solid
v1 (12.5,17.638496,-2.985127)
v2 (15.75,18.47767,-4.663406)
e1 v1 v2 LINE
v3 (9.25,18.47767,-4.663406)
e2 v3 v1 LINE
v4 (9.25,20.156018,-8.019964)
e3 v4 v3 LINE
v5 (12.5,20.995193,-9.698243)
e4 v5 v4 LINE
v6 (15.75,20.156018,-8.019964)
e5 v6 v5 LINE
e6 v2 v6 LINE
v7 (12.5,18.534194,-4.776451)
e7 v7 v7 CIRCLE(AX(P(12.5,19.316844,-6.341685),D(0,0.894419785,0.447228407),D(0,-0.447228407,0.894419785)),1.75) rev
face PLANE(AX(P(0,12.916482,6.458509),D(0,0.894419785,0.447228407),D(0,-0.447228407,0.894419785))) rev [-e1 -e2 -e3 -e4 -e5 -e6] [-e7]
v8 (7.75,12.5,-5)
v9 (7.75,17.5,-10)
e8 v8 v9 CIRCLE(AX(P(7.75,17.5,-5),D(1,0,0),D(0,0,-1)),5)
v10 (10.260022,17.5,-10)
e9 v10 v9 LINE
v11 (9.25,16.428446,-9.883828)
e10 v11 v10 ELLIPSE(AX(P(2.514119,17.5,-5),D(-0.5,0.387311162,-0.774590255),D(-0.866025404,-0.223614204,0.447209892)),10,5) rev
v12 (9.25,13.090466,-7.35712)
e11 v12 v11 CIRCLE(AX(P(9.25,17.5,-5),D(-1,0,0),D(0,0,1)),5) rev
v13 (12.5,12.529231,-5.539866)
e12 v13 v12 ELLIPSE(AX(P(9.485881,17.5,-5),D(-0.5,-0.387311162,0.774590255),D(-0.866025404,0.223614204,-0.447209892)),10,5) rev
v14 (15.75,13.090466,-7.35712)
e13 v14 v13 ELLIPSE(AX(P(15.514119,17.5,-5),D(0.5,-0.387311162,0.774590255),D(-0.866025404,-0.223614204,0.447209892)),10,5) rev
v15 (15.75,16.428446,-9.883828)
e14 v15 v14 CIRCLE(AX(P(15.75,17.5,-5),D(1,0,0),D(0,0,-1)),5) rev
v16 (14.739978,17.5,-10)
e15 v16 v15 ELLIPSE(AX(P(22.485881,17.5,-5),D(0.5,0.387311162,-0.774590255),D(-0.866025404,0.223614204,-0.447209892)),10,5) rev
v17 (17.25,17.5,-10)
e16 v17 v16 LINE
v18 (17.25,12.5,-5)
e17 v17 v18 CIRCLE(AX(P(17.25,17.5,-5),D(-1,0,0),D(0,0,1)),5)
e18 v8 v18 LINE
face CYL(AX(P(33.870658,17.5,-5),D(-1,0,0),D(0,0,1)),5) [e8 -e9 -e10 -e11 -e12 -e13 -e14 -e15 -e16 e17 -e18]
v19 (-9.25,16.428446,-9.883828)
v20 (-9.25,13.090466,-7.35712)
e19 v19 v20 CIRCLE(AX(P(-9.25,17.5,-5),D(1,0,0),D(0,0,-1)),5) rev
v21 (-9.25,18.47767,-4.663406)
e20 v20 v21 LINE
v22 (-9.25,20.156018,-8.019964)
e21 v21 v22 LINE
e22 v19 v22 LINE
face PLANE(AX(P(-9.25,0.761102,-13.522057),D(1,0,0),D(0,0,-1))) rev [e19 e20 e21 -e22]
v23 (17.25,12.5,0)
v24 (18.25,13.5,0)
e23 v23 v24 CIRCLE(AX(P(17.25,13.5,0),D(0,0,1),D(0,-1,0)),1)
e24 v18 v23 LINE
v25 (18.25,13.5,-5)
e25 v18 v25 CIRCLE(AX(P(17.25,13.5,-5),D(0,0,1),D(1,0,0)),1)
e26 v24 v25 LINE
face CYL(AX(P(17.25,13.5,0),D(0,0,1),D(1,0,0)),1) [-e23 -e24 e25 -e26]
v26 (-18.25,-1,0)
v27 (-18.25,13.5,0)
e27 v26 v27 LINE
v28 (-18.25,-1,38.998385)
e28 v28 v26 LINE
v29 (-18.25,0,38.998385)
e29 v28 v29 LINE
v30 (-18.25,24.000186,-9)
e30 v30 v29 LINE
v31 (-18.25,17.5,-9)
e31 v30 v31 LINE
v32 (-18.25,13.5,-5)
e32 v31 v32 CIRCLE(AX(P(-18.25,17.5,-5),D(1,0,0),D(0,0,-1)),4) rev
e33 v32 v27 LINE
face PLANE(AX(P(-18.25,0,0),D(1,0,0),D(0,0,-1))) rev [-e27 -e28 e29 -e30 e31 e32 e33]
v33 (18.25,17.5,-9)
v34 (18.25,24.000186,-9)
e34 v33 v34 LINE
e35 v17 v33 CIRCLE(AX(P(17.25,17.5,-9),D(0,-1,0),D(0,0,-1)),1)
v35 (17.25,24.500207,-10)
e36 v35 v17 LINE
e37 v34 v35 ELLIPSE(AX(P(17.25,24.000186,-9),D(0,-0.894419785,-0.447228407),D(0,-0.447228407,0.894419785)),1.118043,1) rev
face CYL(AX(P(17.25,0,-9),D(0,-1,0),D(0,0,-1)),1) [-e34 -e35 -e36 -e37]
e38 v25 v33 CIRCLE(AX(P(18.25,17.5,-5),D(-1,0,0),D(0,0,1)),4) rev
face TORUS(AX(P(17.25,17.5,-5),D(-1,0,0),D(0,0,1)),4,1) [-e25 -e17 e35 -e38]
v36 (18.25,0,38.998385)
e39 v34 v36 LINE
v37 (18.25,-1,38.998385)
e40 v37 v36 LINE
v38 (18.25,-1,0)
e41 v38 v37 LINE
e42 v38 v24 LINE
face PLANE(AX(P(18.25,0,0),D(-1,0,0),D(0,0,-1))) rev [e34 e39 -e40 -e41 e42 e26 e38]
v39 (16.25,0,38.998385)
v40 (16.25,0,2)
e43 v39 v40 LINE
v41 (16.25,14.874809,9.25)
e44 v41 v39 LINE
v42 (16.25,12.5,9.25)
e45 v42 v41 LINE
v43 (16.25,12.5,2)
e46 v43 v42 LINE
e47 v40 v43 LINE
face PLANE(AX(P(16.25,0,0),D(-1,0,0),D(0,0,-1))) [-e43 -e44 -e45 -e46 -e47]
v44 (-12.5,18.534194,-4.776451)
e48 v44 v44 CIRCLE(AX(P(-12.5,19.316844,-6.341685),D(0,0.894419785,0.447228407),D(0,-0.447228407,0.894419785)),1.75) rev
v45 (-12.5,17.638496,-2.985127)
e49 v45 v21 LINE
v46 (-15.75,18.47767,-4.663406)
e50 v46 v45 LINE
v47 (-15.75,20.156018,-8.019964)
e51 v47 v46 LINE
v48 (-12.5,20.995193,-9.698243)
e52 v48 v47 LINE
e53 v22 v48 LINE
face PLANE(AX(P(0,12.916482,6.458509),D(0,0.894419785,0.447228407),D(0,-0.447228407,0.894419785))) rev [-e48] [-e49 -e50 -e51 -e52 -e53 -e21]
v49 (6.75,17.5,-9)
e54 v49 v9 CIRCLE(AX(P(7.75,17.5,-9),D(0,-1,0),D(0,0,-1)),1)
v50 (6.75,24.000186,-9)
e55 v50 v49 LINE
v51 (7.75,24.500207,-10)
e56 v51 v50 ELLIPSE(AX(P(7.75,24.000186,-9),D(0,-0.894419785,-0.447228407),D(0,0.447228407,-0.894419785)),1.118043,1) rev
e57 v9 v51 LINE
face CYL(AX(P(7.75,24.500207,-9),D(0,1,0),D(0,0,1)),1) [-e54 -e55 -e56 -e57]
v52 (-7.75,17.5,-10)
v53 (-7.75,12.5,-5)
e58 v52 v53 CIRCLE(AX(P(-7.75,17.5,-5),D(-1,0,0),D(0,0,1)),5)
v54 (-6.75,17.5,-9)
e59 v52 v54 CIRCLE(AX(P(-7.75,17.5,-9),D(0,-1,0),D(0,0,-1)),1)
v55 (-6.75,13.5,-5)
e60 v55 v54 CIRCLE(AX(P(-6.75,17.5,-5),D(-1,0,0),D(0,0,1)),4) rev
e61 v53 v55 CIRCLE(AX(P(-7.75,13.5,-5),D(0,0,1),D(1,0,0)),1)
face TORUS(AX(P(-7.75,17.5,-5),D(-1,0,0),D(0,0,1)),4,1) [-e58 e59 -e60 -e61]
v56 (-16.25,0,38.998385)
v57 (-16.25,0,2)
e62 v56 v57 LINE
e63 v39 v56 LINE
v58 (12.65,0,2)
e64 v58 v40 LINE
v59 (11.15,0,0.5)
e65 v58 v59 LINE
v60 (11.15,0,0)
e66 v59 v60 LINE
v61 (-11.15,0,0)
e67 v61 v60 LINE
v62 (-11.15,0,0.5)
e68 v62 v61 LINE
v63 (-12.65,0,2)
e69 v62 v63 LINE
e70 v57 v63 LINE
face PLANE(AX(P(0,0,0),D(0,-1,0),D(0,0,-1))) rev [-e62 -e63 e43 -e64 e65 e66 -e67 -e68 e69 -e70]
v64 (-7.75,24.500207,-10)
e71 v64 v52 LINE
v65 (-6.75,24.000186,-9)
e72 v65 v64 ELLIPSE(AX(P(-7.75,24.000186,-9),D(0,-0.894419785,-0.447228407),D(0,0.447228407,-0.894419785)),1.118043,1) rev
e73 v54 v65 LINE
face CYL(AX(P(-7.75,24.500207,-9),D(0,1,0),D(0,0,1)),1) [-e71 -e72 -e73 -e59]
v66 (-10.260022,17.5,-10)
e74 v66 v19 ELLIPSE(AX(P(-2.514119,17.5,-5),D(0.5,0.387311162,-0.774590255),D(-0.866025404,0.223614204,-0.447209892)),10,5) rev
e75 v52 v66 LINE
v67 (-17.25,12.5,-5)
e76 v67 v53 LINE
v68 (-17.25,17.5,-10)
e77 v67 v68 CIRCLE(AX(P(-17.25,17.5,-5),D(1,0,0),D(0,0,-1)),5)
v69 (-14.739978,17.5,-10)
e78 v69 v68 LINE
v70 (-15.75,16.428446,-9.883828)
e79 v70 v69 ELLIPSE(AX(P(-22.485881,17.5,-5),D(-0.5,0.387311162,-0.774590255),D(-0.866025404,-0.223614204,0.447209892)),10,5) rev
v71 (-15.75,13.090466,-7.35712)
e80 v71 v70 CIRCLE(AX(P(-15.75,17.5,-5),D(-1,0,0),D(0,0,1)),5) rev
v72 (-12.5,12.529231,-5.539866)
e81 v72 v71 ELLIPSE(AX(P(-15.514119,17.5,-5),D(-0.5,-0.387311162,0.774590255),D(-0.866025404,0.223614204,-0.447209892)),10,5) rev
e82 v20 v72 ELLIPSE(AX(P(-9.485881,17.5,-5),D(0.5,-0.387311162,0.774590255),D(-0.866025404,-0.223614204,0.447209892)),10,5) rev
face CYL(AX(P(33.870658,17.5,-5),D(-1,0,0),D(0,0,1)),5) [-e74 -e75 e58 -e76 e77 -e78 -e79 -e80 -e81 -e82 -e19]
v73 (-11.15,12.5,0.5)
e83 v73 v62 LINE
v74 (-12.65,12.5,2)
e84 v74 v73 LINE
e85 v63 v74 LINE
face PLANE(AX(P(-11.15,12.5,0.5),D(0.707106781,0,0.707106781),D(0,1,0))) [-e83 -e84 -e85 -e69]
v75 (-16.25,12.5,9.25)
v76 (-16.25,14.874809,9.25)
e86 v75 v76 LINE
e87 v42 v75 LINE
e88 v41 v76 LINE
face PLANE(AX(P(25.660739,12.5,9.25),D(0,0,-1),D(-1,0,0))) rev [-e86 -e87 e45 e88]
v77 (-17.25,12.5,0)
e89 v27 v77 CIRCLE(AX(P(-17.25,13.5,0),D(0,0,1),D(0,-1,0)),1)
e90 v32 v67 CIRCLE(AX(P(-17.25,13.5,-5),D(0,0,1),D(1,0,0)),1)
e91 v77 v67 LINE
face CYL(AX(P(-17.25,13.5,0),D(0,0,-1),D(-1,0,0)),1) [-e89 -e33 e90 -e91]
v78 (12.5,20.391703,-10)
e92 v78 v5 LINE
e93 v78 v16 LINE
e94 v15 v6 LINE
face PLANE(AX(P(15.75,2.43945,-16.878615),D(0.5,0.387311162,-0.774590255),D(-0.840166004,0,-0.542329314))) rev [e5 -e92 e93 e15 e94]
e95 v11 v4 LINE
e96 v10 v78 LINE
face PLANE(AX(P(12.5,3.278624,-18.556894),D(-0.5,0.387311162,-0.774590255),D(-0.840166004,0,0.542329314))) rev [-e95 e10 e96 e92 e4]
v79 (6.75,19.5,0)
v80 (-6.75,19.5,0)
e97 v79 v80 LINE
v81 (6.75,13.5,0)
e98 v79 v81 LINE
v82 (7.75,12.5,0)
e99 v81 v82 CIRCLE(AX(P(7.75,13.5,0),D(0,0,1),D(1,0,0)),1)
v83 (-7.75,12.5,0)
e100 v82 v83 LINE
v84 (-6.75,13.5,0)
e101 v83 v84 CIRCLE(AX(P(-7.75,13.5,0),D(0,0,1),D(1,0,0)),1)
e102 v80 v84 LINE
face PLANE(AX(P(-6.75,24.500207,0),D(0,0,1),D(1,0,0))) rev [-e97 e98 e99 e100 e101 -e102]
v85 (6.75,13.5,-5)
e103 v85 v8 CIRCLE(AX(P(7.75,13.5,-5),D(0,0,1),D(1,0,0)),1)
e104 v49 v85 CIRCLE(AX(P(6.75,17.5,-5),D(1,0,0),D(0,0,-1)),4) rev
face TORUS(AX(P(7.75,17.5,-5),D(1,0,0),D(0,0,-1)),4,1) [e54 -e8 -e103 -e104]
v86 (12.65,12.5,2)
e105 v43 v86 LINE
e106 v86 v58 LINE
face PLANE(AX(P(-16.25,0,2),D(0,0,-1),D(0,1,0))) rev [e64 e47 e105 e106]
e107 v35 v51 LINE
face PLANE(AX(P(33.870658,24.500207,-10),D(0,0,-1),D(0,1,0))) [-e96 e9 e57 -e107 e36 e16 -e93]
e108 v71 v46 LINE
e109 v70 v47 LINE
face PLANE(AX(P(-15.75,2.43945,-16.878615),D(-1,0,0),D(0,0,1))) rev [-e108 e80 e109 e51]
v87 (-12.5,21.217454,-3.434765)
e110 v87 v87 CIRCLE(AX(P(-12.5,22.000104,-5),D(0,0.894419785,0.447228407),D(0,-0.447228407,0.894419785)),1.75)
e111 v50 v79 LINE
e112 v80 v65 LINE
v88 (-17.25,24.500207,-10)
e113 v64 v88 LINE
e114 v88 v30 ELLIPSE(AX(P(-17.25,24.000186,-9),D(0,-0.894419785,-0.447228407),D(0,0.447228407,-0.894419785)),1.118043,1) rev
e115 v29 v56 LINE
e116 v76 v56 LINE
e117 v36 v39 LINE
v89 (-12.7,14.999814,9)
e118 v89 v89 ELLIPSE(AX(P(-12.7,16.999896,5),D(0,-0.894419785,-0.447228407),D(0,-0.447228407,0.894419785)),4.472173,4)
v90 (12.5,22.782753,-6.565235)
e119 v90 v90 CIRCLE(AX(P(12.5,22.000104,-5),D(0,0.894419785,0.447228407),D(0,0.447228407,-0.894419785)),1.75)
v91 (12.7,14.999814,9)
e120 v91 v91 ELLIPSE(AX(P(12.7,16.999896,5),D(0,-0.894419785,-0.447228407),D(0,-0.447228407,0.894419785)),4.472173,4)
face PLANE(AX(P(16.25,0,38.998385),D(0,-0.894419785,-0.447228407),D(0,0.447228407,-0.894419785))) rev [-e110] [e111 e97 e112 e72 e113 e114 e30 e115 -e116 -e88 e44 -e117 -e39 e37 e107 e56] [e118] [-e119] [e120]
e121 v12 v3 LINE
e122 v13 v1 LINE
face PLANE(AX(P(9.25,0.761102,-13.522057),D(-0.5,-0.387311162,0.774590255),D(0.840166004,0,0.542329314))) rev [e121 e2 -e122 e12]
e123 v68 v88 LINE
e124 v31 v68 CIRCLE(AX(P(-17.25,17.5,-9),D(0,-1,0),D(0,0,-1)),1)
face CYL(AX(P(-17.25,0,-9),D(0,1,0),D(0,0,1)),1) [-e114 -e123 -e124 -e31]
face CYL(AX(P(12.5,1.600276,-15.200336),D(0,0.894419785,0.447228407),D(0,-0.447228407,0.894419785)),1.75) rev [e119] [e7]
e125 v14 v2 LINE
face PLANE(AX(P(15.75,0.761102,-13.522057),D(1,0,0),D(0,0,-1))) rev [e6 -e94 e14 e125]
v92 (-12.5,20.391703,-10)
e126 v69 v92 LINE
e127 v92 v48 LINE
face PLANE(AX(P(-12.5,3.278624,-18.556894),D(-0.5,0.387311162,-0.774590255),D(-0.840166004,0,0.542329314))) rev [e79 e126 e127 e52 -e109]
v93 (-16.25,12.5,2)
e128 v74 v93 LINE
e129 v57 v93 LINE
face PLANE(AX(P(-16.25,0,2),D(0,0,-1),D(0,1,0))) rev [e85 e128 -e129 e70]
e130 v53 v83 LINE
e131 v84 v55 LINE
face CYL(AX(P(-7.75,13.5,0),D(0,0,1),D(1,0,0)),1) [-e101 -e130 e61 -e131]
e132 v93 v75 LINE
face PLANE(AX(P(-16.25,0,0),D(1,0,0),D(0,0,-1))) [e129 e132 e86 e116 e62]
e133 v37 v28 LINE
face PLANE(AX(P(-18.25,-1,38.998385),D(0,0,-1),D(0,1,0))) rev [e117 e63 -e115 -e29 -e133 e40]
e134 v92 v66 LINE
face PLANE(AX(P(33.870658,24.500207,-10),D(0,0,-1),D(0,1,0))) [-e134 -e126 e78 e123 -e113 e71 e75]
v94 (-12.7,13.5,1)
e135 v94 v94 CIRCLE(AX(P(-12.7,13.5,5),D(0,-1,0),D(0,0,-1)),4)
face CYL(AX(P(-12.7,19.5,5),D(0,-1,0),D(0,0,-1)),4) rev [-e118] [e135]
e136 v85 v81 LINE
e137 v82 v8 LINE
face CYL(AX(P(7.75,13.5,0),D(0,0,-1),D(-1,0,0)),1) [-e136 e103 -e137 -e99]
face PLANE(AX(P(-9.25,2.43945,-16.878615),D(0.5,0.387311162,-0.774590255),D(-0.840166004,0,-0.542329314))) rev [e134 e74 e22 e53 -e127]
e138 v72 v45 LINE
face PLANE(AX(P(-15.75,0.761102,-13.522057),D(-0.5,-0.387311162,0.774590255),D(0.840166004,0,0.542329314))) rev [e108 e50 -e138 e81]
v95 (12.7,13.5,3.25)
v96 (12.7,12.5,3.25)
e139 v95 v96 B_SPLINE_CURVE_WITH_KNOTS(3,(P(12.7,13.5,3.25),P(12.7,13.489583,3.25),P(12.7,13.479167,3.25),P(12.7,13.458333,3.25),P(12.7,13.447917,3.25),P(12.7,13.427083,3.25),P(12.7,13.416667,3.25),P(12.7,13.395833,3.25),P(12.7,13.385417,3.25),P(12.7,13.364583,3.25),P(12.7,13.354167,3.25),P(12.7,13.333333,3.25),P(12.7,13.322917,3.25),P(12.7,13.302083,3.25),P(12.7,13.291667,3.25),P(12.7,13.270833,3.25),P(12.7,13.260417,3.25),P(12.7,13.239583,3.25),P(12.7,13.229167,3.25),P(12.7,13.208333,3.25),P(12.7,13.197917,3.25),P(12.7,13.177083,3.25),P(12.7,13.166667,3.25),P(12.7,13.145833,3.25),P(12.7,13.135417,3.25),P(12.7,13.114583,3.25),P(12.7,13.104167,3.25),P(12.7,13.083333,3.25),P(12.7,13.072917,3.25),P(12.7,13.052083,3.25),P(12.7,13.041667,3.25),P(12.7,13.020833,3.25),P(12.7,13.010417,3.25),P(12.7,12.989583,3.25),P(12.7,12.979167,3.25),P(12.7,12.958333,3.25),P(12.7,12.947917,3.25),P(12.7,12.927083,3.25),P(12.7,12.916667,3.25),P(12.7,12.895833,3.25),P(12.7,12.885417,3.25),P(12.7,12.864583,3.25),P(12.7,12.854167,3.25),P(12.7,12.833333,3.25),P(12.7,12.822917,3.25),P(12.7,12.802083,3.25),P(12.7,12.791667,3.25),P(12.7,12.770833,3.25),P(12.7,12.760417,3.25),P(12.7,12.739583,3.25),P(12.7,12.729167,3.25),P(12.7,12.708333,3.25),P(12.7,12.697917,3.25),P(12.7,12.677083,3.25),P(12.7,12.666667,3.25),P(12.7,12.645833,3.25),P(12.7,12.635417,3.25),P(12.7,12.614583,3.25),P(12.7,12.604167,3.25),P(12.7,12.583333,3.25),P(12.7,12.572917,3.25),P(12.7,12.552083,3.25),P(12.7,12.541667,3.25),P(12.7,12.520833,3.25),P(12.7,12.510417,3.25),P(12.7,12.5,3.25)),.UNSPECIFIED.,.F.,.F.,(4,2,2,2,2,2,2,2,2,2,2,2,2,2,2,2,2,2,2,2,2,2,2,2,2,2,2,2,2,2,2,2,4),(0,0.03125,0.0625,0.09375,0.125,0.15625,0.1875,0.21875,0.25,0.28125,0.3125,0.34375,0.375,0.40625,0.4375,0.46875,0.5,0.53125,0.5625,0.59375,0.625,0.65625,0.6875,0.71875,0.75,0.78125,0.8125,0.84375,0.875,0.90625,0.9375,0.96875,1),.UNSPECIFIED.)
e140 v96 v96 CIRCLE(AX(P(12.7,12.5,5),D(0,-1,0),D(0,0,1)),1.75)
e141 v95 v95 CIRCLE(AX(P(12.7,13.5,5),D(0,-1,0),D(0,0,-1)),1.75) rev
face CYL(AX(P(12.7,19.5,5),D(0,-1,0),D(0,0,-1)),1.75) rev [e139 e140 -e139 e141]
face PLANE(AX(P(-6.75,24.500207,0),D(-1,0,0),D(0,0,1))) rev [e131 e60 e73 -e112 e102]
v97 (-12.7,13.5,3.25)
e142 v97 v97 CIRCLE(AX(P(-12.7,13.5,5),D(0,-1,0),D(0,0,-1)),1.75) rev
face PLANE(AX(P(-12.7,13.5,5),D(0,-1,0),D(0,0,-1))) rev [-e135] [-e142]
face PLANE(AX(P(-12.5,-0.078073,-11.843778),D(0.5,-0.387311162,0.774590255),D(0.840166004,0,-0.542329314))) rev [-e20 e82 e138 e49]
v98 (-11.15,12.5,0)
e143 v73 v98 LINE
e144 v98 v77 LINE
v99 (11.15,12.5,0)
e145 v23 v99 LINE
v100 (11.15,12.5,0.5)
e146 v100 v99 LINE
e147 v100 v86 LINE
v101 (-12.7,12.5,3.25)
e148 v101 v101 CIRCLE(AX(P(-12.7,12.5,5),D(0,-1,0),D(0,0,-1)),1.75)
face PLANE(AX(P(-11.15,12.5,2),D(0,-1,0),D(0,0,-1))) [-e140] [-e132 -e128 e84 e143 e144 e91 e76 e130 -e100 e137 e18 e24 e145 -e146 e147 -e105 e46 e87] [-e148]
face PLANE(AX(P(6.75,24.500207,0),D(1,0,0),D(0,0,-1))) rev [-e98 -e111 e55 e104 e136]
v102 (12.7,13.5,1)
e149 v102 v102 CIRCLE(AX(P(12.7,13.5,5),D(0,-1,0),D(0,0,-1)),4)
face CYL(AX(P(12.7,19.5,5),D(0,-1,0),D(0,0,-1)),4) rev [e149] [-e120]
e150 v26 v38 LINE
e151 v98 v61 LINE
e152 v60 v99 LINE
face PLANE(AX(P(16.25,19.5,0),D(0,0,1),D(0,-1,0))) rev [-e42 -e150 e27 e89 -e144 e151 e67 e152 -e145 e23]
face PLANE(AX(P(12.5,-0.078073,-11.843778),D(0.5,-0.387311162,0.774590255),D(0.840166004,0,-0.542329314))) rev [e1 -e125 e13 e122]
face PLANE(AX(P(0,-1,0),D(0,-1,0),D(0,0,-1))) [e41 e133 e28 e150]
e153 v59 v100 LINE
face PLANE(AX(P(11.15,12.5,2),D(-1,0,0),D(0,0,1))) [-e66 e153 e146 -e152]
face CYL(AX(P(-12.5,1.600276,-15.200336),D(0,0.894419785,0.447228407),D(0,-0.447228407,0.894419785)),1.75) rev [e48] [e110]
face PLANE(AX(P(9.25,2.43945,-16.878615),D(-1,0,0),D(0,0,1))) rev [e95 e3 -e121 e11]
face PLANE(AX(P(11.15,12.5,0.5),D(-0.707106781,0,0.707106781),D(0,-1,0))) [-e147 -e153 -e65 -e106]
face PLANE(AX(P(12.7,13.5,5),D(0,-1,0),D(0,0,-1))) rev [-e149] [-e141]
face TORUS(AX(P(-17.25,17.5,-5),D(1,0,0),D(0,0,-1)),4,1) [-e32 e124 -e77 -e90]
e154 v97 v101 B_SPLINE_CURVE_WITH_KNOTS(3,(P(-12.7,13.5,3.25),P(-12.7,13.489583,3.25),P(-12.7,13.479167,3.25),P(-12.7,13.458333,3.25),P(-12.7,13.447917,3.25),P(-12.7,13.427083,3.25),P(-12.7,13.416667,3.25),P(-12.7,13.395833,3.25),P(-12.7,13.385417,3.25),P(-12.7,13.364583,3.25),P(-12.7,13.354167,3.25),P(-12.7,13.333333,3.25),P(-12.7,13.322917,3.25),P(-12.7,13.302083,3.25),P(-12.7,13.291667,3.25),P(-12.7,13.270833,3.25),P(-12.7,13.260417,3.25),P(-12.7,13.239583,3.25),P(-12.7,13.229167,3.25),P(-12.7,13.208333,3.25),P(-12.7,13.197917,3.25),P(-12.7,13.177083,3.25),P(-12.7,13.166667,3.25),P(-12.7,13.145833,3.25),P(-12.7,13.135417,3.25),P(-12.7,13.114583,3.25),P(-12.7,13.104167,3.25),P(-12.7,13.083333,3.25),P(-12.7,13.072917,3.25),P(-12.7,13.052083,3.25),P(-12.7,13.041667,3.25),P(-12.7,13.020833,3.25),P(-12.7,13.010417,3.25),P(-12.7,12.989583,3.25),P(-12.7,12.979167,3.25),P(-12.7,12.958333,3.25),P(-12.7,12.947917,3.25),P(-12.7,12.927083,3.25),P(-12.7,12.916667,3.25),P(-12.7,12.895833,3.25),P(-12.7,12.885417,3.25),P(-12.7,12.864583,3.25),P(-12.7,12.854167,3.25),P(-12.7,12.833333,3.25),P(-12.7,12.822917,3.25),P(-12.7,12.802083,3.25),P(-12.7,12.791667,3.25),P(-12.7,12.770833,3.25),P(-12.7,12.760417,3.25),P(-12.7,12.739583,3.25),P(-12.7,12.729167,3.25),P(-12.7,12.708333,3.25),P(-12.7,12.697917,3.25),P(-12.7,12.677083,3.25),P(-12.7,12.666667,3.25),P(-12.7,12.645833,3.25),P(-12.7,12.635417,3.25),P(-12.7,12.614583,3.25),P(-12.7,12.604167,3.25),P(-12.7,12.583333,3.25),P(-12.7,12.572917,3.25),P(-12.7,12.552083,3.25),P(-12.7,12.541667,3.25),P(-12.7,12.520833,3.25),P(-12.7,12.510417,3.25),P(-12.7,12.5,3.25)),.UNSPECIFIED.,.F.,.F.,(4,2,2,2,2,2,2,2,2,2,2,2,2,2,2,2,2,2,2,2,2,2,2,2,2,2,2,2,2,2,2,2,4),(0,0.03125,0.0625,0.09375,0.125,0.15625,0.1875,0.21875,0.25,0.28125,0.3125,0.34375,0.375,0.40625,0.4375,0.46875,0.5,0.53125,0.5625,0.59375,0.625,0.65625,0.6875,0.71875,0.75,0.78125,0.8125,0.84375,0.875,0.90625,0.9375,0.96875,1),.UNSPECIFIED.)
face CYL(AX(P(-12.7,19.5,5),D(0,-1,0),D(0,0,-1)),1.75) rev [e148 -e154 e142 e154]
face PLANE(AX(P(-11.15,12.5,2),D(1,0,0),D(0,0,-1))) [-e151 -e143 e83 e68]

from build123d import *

# Parameters (mm, degrees)
BOSS_EXTRUDE1_DEPTH             = 16.25
CUT_EXTRUDE7_DEPTH              = 47.531565279
CUT_EXTRUDE7_DEPTH_BACK         = 47.531565279
SKETCH2_W                       = 22.3
SKETCH2_H                       = 12.5
CUT_EXTRUDE1_DEPTH              = 26.461981463
BOSS_EXTRUDE2_DEPTH             = 2
BOSS_EXTRUDE4_REACH             = 49.267
BOSS_EXTRUDE4_DIRECTION_2_REACH = 49.267
SKETCH12_R                      = 1.75
CUT_EXTRUDE8_DEPTH              = 45.835104186
CUT_EXTRUDE10_START             = -1
SKETCH14_R                      = 4
CUT_EXTRUDE10_DEPTH             = 44.835104186
SKETCH15_W                      = 36.5
SKETCH15_H                      = 38.998385445
BOSS_EXTRUDE5_DEPTH             = 1
BOSS_EXTRUDE6_DEPTH             = 36.5
SKETCH18_W                      = 13.5
SKETCH18_H                      = 10
CUT_EXTRUDE12_DEPTH             = 46.124124006
SKETCH21_R                      = 1.75
CUT_EXTRUDE15_DEPTH             = 40.773623022
CUT_EXTRUDE16_START             = -3
CUT_EXTRUDE16_DEPTH             = 37.773623022
CHAMFER1_SIZE                   = 1.5
FILLET1_R                       = 5
FILLET2_R                       = 1


with BuildPart() as part:
    # Sketch1 → Boss-Extrude1 (new, symmetric)
    with BuildSketch(Plane(origin=(0, 0, 0), x_dir=(0, 0, -1), z_dir=(1, 0, 0))):
        Polygon((0, 19.5), (0, 0), (-38.998385445, 0), align=None)
    extrude(amount=BOSS_EXTRUDE1_DEPTH, both=True)

    # Sketch10 → Cut-Extrude7 (cut, two sides: drawn at the far end of the back side and taken through both)
    with BuildSketch(Plane(origin=(0, 0, 0), x_dir=(0, 0, -1), z_dir=(1, 0, 0)).offset(-CUT_EXTRUDE7_DEPTH_BACK)):
        Polygon((-2, 0), (-2, 18.499958599), (-38.998385445, 0), align=None)
    extrude(amount=CUT_EXTRUDE7_DEPTH + CUT_EXTRUDE7_DEPTH_BACK, mode=Mode.SUBTRACT)

    # Sketch2 → Cut-Extrude1 (cut, through all)
    with BuildSketch(Plane.XY):
        with Locations((0, 6.25)):
            Rectangle(SKETCH2_W, SKETCH2_H)
    extrude(amount=CUT_EXTRUDE1_DEPTH, mode=Mode.SUBTRACT)

    # Sketch6 → Boss-Extrude2 (add)
    with BuildSketch(Plane(origin=(-16.25, 0, 0), x_dir=(0, 0, -1), z_dir=(1, 0, 0))):
        Polygon((-2, 0), (-38.998385445, 0), (-2, 18.499958599), (0, 19.5), (0, 0), align=None)
    boss_extrude2 = extrude(amount=-BOSS_EXTRUDE2_DEPTH)

    # Mirror1: Boss-Extrude2 across plane
    add(boss_extrude2.mirror(Plane(origin=(0, 0, 0), x_dir=(0, 0, 1), z_dir=(1, 0, 0))))

    # Boss-Extrude4: up to this face of the body (flat: up to its plane)
    boss_extrude4_end = Plane(part.part.faces().sort_by_distance((16.25, 6.166652866, 14.332795148))[0])
    # Sketch11 → Boss-Extrude4 (add, up to the picked face)
    with BuildSketch(Plane(origin=(0, 0, 0), x_dir=(0, 0, -1), z_dir=(1, 0, 0)), mode=Mode.PRIVATE) as boss_extrude4_sk1:
        Polygon((-2, 18.499958599), (-9.25, 14.874808522), (-9.25, 12.5), (-2, 12.5), align=None)
    boss_extrude4_tool1 = split(extrude(boss_extrude4_sk1.sketch, amount=BOSS_EXTRUDE4_REACH, mode=Mode.PRIVATE), bisect_by=boss_extrude4_end, keep=Keep.BOTH, mode=Mode.PRIVATE)
    add(boss_extrude4_tool1.solids().sort_by(Axis((0, 14.724459, 5.101954), (1, 0, 0)))[0])

    # Boss-Extrude4 direction 2: up to this face of the body (flat: up to its plane)
    boss_extrude4_direction_2_end = Plane(part.part.faces().sort_by_distance((-16.25, 6.166652866, 14.332795148))[0])
    # Sketch11 → Boss-Extrude4 direction 2 (add, up to the picked face)
    with BuildSketch(Plane(origin=(0, 0, 0), x_dir=(0, 0, -1), z_dir=(1, 0, 0)), mode=Mode.PRIVATE) as boss_extrude4_direction_2_sk1:
        Polygon((-2, 18.499958599), (-9.25, 14.874808522), (-9.25, 12.5), (-2, 12.5), align=None)
    boss_extrude4_direction_2_tool1 = split(extrude(boss_extrude4_direction_2_sk1.sketch, amount=-BOSS_EXTRUDE4_DIRECTION_2_REACH, mode=Mode.PRIVATE), bisect_by=boss_extrude4_direction_2_end, keep=Keep.BOTH, mode=Mode.PRIVATE)
    add(boss_extrude4_direction_2_tool1.solids().sort_by(Axis((0, 14.724459, 5.101954), (-1, 0, 0)))[0])

    # Sketch12 → Cut-Extrude8 (cut, through all)
    with BuildSketch(Plane.XZ.offset(-12.5)):
        with Locations(Location((-12.7, 5, 0), (0, 0, 270))):
            Circle(SKETCH12_R)
        with Locations(Location((12.7, 5, 0), (0, 0, 90))):
            Circle(SKETCH12_R)
    extrude(amount=-CUT_EXTRUDE8_DEPTH, mode=Mode.SUBTRACT)

    # Sketch14 → Cut-Extrude10 (cut, through all)
    with BuildSketch(Plane.XZ.offset(-12.5).offset(CUT_EXTRUDE10_START)):
        with Locations(Location((-12.7, 5, 0), (0, 0, 270))):
            Circle(SKETCH14_R)
        with Locations(Location((12.7, 5, 0), (0, 0, 270))):
            Circle(SKETCH14_R)
    extrude(amount=-CUT_EXTRUDE10_DEPTH, mode=Mode.SUBTRACT)

    # Sketch15 → Boss-Extrude5 (add)
    with BuildSketch(Plane.XZ):
        with Locations((0, 19.499192723)):
            Rectangle(SKETCH15_W, SKETCH15_H)
    extrude(amount=BOSS_EXTRUDE5_DEPTH)

    # Sketch17 → Boss-Extrude6 (add)
    with BuildSketch(Plane.ZY.offset(18.25)):
        Polygon((0, 19.5), (-10, 24.500207003), (-10, 12.5), (0, 12.5), align=None)
    extrude(amount=-BOSS_EXTRUDE6_DEPTH)

    # Sketch18 → Cut-Extrude12 (cut, through all)
    with BuildSketch(Plane.XZ.offset(-12.5)):
        with Locations((0, -5)):
            Rectangle(SKETCH18_W, SKETCH18_H)
    extrude(amount=-CUT_EXTRUDE12_DEPTH, mode=Mode.SUBTRACT)

    # Sketch21 → Cut-Extrude15 (cut, through all)
    with BuildSketch(Plane(origin=(0, 15.599741659, 7.800193749), x_dir=(1, 0, 0), z_dir=(0, 0.8944197849825609, 0.44722840722806245))):
        with Locations(Location((-12.5, 14.311170173, 0), (0, 0, 270))):
            Circle(SKETCH21_R)
        with Locations(Location((12.5, 14.311170173, 0), (0, 0, 172.6663404))):
            Circle(SKETCH21_R)
    extrude(amount=-CUT_EXTRUDE15_DEPTH, mode=Mode.SUBTRACT)

    # Sketch22 → Cut-Extrude16 (cut, through all)
    with BuildSketch(Plane(origin=(0, 15.599741659, 7.800193749), x_dir=(1, 0, 0), z_dir=(0, 0.8944197849825609, 0.44722840722806245)).offset(CUT_EXTRUDE16_START)):
        Polygon((12.5, 18.063946922), (9.25, 16.187558548), (9.25, 12.434781798), (12.5, 10.558393423), (15.75, 12.434781798), (15.75, 16.187558548), align=None)
        Polygon((-12.5, 18.063946922), (-15.75, 16.187558548), (-15.75, 12.434781798), (-12.5, 10.558393423), (-9.25, 12.434781798), (-9.25, 16.187558548), align=None)
    extrude(amount=-CUT_EXTRUDE16_DEPTH, mode=Mode.SUBTRACT)

    # Chamfer1
    chamfer1_edges = [part.edges().sort_by_distance(p)[0] for p in [
        (11.15, 6.25, 2),
        (-11.15, 6.25, 2),
    ]]
    chamfer(chamfer1_edges, length=CHAMFER1_SIZE)

    # Fillet1
    # the kernel refuses this fillet: 5 mm, written as the material it takes off along each edge
    with BuildSketch(Plane(origin=(-21.75, 12.5, -10), x_dir=(0, 0, 1), z_dir=(1, 0, 0)), Plane(origin=(3.25, 12.5, -10), x_dir=(0, 0, 1), z_dir=(1, 0, 0))) as fillet1_piece_1:
        with BuildLine():
            CenterArc((FILLET1_R, -FILLET1_R), FILLET1_R, 90, 90)
            Line((0, -FILLET1_R), (0, 0))
            Line((0, 0), (FILLET1_R, 0))
        make_face()
    extrude(amount=27.5, mode=Mode.SUBTRACT)

    # Fillet2
    fillet2_edges = [part.edges().sort_by_distance(p)[0] for p in [
        (-18.25, 21.000103501, -10),
        (18.25, 12.5, -2.5),
        (-6.75, 21.000103501, -10),
        (6.75, 21.000103501, -10),
        (-6.75, 12.5, -2.5),
        (-18.25, 12.5, -2.5),
        (-18.25, 13.964466094, -8.535533906),
        (6.75, 12.5, -2.5),
        (-6.75, 13.964466094, -8.535533906),
        (18.25, 21.000103501, -10),
        (6.75, 13.964466094, -8.535533906),
        (18.25, 13.964466094, -8.535533906),
    ]]
    fillet(fillet2_edges, radius=FILLET2_R)


solid = part.part
